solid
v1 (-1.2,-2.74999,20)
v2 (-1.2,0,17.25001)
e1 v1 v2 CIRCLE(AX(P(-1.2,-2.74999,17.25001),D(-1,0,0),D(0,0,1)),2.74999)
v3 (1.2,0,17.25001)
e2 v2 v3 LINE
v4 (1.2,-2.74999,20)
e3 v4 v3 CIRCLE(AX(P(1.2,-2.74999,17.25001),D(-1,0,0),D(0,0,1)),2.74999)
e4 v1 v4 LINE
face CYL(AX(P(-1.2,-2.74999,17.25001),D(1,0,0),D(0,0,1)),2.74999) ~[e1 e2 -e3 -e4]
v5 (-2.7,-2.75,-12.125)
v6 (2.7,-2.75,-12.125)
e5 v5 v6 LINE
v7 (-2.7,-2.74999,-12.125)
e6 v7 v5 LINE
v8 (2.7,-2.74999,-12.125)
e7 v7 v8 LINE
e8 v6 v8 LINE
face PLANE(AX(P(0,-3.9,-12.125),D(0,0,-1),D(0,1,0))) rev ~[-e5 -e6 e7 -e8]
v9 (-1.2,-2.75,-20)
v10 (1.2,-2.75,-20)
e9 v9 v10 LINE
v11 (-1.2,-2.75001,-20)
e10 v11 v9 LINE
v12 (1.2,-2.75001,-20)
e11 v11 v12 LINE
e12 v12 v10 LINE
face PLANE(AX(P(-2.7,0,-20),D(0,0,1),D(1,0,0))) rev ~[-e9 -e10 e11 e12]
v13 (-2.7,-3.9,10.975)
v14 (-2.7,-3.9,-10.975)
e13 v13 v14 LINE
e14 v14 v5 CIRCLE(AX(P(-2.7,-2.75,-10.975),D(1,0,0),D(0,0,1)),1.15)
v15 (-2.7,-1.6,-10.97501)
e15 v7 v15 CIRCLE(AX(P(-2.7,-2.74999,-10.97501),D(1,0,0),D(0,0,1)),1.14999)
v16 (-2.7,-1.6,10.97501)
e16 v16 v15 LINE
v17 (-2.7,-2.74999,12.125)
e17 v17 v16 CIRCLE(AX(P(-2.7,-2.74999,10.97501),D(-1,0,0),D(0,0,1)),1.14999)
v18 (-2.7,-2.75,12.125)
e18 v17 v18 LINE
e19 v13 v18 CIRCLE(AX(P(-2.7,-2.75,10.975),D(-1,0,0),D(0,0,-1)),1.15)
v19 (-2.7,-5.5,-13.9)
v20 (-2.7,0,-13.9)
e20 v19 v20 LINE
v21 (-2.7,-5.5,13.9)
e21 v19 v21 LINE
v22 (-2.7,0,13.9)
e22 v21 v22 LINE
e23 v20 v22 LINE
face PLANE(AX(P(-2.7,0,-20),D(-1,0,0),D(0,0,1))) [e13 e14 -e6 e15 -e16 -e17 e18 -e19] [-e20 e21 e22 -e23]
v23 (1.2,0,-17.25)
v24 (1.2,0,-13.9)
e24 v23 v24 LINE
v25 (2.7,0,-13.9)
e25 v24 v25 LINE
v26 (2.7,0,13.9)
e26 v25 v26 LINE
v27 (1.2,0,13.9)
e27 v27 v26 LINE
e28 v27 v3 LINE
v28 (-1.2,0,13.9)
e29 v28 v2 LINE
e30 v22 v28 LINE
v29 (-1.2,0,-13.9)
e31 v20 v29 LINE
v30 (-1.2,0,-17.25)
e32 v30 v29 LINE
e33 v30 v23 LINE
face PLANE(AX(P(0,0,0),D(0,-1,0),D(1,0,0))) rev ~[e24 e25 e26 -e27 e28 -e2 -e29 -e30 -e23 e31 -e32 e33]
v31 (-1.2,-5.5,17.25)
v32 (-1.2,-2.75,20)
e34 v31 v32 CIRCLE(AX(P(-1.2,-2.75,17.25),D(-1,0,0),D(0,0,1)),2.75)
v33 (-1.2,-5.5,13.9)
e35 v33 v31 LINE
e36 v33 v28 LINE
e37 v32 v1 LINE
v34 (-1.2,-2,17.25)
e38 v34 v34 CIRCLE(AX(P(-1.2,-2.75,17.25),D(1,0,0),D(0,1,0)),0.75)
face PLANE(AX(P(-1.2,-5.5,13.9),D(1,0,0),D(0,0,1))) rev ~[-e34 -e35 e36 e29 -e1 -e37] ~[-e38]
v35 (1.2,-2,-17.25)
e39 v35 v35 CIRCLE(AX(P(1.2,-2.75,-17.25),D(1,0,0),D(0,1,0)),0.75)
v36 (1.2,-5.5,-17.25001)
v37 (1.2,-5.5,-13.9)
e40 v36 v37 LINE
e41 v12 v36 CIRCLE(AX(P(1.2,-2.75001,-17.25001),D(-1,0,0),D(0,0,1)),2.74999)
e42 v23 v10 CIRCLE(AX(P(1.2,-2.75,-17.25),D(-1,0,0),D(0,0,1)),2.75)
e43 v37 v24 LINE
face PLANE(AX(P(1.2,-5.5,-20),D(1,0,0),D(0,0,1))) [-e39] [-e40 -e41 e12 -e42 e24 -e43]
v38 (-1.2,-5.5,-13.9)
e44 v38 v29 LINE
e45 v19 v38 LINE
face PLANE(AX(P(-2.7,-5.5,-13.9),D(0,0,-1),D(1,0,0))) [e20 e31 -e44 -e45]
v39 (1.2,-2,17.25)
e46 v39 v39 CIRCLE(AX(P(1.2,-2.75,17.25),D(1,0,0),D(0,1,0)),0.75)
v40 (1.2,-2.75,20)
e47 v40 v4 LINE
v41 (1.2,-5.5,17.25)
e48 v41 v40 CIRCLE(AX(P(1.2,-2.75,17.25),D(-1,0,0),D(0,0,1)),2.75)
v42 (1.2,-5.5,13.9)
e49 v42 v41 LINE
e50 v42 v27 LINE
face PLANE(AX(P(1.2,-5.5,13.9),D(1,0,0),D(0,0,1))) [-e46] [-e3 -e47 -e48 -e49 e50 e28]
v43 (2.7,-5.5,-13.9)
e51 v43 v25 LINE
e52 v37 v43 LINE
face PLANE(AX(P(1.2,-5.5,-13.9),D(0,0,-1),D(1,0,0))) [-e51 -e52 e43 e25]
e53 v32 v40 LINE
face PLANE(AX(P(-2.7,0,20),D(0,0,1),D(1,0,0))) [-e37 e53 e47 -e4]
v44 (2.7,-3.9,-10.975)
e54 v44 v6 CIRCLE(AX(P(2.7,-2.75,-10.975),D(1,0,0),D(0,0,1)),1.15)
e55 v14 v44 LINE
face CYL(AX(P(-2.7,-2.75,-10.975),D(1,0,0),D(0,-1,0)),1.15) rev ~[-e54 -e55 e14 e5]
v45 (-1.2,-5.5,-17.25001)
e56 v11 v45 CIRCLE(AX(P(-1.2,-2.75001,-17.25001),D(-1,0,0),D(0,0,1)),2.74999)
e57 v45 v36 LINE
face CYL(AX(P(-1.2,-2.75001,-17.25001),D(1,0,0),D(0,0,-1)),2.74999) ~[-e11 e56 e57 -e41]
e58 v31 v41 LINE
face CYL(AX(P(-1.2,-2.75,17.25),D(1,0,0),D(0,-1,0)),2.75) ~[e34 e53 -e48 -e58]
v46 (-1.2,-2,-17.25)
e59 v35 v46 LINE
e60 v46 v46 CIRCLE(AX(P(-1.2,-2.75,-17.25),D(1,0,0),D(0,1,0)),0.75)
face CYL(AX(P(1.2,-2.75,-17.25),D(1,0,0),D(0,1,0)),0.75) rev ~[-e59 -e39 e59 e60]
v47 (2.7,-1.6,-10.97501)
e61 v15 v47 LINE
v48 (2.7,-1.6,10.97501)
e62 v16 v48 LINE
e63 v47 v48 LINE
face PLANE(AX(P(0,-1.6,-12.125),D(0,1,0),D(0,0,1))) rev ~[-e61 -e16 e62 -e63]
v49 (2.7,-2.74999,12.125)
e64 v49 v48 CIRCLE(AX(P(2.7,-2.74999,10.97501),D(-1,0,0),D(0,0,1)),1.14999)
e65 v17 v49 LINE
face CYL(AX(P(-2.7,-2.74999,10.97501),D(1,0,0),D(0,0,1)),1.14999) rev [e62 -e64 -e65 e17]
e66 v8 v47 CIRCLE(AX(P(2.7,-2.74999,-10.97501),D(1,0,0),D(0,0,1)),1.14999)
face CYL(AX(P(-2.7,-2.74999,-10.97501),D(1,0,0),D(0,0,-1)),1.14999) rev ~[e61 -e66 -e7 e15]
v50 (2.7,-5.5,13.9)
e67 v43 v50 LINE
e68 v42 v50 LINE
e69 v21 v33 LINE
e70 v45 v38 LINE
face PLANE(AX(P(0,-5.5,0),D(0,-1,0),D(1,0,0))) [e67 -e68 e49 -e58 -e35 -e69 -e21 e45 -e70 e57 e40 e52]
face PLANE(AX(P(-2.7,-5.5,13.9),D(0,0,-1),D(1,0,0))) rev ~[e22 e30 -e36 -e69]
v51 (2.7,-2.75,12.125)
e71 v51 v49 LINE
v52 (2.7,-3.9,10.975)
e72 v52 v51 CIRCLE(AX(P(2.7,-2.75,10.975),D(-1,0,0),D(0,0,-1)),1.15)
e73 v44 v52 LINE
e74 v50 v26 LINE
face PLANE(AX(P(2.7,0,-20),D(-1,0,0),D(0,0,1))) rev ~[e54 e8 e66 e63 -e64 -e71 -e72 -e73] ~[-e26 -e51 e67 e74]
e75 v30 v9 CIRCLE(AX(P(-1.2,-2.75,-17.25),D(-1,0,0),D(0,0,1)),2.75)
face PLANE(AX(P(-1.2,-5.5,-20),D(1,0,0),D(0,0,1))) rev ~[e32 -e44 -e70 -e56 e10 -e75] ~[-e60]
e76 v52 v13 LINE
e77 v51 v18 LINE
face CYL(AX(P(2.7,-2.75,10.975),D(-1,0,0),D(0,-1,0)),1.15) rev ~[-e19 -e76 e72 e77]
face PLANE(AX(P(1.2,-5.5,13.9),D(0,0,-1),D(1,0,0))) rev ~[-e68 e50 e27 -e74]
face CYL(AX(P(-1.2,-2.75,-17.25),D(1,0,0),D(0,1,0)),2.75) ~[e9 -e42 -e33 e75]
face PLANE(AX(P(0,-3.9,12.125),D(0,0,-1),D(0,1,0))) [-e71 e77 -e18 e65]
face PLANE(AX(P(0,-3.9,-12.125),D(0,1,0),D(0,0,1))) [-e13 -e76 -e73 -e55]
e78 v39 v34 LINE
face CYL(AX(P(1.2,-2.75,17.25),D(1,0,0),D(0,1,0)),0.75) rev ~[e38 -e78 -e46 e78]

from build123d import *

# Parameters (mm, degrees)
F0_W      = 5.4
F0_H      = 40
F1_DEPTH  = 5.5
F2_W      = 1.5
F2_H      = 6.1
F3_DEPTH  = 5.501
F4_W      = 1.5
F4_H      = 6.1
F5_DEPTH  = 25
F6_W      = 1.5
F6_H      = 6.1
F7_DEPTH  = 5.501
F8_W      = 1.5
F8_H      = 6.1
F9_DEPTH  = 5.501
F10_R     = 2.75
F11_R     = 2.74999
F12_R     = 2.75
F13_R     = 2.74999
F14_W     = 2.3
F14_H     = 24.25
F15_DEPTH = 2.701
F16_DEPTH = 2.701
F17_R     = 1.15
F18_R     = 1.14999
F19_R     = 1.15
F20_R     = 1.14999
F21_R     = 0.75
F22_DEPTH = 3.901
F23_R     = 0.75
F24_DEPTH = 3.901


# Not quite as in the source:
# - a fillet or chamfer is up to 0.001 mm smaller than in the source, because OpenCascade refuses the exact size


with BuildPart() as f1:
    # F0 (on Front) → F1 (new body)
    with BuildSketch(Plane.XZ):
        Rectangle(F0_W, F0_H)
    extrude(amount=F1_DEPTH)

    # F2 (on face) → F3 (cut, through all)
    with BuildSketch(Plane.XZ.offset(5.5)):
        with Locations((-1.95, 16.95)):
            Rectangle(F2_W, F2_H)
    extrude(amount=-F3_DEPTH, mode=Mode.SUBTRACT)

    # F4 (on face) → F5 (cut)
    with BuildSketch(Plane.XZ.offset(5.5)):
        with Locations((1.95, 16.95)):
            Rectangle(F4_W, F4_H)
    extrude(amount=-F5_DEPTH, mode=Mode.SUBTRACT)

    # F6 (on face) → F7 (cut, through all)
    with BuildSketch(Plane.XZ.offset(5.5)):
        with Locations((-1.95, -16.95)):
            Rectangle(F6_W, F6_H)
    extrude(amount=-F7_DEPTH, mode=Mode.SUBTRACT)

    # F8 (on face) → F9 (cut, through all)
    with BuildSketch(Plane.XZ.offset(5.5)):
        with Locations((1.95, -16.95)):
            Rectangle(F8_W, F8_H)
    extrude(amount=-F9_DEPTH, mode=Mode.SUBTRACT)

    # F10
    f10_edges = [f1.edges().sort_by_distance(p)[0] for p in [
        (0, -5.5, 20),
    ]]
    fillet(f10_edges, radius=F10_R)

    # F11 (radius 2.75 in the source; OpenCascade refuses exactly that, so slightly less here)
    f11_edges = [f1.edges().sort_by_distance(p)[0] for p in [
        (0, 0, 20),
    ]]
    fillet(f11_edges, radius=F11_R)

    # F12
    f12_edges = [f1.edges().sort_by_distance(p)[0] for p in [
        (0, 0, -20),
    ]]
    fillet(f12_edges, radius=F12_R)

    # F13 (radius 2.75 in the source; OpenCascade refuses exactly that, so slightly less here)
    f13_edges = [f1.edges().sort_by_distance(p)[0] for p in [
        (0, -5.5, -20),
    ]]
    fillet(f13_edges, radius=F13_R)

    # F14 (on Right) → F15 (cut, through all)
    with BuildSketch(Plane.YZ):
        with Locations((-2.75, 0)):
            Rectangle(F14_W, F14_H)
    extrude(amount=-F15_DEPTH, mode=Mode.SUBTRACT)

    # F14 (on Right) → F16 (cut, through all)
    with BuildSketch(Plane.YZ):
        with Locations((-2.75, 0)):
            Rectangle(F14_W, F14_H)
    extrude(amount=F16_DEPTH, mode=Mode.SUBTRACT)

    # F17
    f17_edges = [f1.edges().sort_by_distance(p)[0] for p in [
        (0, -3.9, 12.125),
    ]]
    fillet(f17_edges, radius=F17_R)

    # F18 (radius 1.15 in the source; OpenCascade refuses exactly that, so slightly less here)
    f18_edges = [f1.edges().sort_by_distance(p)[0] for p in [
        (0, -1.6, 12.125),
    ]]
    fillet(f18_edges, radius=F18_R)

    # F19
    f19_edges = [f1.edges().sort_by_distance(p)[0] for p in [
        (0, -3.9, -12.125),
    ]]
    fillet(f19_edges, radius=F19_R)

    # F20 (radius 1.15 in the source; OpenCascade refuses exactly that, so slightly less here)
    f20_edges = [f1.edges().sort_by_distance(p)[0] for p in [
        (0, -1.6, -12.125),
    ]]
    fillet(f20_edges, radius=F20_R)

    # F21 (on face) → F22 (cut, through all)
    with BuildSketch(Plane.YZ.offset(1.2)):
        with Locations((-2.75, 17.25)):
            Circle(F21_R)
    extrude(amount=-F22_DEPTH, mode=Mode.SUBTRACT)

    # F23 (on face) → F24 (cut, through all)
    with BuildSketch(Plane.YZ.offset(1.2)):
        with Locations((-2.75, -17.25)):
            Circle(F23_R)
    extrude(amount=-F24_DEPTH, mode=Mode.SUBTRACT)


solid = f1.part
